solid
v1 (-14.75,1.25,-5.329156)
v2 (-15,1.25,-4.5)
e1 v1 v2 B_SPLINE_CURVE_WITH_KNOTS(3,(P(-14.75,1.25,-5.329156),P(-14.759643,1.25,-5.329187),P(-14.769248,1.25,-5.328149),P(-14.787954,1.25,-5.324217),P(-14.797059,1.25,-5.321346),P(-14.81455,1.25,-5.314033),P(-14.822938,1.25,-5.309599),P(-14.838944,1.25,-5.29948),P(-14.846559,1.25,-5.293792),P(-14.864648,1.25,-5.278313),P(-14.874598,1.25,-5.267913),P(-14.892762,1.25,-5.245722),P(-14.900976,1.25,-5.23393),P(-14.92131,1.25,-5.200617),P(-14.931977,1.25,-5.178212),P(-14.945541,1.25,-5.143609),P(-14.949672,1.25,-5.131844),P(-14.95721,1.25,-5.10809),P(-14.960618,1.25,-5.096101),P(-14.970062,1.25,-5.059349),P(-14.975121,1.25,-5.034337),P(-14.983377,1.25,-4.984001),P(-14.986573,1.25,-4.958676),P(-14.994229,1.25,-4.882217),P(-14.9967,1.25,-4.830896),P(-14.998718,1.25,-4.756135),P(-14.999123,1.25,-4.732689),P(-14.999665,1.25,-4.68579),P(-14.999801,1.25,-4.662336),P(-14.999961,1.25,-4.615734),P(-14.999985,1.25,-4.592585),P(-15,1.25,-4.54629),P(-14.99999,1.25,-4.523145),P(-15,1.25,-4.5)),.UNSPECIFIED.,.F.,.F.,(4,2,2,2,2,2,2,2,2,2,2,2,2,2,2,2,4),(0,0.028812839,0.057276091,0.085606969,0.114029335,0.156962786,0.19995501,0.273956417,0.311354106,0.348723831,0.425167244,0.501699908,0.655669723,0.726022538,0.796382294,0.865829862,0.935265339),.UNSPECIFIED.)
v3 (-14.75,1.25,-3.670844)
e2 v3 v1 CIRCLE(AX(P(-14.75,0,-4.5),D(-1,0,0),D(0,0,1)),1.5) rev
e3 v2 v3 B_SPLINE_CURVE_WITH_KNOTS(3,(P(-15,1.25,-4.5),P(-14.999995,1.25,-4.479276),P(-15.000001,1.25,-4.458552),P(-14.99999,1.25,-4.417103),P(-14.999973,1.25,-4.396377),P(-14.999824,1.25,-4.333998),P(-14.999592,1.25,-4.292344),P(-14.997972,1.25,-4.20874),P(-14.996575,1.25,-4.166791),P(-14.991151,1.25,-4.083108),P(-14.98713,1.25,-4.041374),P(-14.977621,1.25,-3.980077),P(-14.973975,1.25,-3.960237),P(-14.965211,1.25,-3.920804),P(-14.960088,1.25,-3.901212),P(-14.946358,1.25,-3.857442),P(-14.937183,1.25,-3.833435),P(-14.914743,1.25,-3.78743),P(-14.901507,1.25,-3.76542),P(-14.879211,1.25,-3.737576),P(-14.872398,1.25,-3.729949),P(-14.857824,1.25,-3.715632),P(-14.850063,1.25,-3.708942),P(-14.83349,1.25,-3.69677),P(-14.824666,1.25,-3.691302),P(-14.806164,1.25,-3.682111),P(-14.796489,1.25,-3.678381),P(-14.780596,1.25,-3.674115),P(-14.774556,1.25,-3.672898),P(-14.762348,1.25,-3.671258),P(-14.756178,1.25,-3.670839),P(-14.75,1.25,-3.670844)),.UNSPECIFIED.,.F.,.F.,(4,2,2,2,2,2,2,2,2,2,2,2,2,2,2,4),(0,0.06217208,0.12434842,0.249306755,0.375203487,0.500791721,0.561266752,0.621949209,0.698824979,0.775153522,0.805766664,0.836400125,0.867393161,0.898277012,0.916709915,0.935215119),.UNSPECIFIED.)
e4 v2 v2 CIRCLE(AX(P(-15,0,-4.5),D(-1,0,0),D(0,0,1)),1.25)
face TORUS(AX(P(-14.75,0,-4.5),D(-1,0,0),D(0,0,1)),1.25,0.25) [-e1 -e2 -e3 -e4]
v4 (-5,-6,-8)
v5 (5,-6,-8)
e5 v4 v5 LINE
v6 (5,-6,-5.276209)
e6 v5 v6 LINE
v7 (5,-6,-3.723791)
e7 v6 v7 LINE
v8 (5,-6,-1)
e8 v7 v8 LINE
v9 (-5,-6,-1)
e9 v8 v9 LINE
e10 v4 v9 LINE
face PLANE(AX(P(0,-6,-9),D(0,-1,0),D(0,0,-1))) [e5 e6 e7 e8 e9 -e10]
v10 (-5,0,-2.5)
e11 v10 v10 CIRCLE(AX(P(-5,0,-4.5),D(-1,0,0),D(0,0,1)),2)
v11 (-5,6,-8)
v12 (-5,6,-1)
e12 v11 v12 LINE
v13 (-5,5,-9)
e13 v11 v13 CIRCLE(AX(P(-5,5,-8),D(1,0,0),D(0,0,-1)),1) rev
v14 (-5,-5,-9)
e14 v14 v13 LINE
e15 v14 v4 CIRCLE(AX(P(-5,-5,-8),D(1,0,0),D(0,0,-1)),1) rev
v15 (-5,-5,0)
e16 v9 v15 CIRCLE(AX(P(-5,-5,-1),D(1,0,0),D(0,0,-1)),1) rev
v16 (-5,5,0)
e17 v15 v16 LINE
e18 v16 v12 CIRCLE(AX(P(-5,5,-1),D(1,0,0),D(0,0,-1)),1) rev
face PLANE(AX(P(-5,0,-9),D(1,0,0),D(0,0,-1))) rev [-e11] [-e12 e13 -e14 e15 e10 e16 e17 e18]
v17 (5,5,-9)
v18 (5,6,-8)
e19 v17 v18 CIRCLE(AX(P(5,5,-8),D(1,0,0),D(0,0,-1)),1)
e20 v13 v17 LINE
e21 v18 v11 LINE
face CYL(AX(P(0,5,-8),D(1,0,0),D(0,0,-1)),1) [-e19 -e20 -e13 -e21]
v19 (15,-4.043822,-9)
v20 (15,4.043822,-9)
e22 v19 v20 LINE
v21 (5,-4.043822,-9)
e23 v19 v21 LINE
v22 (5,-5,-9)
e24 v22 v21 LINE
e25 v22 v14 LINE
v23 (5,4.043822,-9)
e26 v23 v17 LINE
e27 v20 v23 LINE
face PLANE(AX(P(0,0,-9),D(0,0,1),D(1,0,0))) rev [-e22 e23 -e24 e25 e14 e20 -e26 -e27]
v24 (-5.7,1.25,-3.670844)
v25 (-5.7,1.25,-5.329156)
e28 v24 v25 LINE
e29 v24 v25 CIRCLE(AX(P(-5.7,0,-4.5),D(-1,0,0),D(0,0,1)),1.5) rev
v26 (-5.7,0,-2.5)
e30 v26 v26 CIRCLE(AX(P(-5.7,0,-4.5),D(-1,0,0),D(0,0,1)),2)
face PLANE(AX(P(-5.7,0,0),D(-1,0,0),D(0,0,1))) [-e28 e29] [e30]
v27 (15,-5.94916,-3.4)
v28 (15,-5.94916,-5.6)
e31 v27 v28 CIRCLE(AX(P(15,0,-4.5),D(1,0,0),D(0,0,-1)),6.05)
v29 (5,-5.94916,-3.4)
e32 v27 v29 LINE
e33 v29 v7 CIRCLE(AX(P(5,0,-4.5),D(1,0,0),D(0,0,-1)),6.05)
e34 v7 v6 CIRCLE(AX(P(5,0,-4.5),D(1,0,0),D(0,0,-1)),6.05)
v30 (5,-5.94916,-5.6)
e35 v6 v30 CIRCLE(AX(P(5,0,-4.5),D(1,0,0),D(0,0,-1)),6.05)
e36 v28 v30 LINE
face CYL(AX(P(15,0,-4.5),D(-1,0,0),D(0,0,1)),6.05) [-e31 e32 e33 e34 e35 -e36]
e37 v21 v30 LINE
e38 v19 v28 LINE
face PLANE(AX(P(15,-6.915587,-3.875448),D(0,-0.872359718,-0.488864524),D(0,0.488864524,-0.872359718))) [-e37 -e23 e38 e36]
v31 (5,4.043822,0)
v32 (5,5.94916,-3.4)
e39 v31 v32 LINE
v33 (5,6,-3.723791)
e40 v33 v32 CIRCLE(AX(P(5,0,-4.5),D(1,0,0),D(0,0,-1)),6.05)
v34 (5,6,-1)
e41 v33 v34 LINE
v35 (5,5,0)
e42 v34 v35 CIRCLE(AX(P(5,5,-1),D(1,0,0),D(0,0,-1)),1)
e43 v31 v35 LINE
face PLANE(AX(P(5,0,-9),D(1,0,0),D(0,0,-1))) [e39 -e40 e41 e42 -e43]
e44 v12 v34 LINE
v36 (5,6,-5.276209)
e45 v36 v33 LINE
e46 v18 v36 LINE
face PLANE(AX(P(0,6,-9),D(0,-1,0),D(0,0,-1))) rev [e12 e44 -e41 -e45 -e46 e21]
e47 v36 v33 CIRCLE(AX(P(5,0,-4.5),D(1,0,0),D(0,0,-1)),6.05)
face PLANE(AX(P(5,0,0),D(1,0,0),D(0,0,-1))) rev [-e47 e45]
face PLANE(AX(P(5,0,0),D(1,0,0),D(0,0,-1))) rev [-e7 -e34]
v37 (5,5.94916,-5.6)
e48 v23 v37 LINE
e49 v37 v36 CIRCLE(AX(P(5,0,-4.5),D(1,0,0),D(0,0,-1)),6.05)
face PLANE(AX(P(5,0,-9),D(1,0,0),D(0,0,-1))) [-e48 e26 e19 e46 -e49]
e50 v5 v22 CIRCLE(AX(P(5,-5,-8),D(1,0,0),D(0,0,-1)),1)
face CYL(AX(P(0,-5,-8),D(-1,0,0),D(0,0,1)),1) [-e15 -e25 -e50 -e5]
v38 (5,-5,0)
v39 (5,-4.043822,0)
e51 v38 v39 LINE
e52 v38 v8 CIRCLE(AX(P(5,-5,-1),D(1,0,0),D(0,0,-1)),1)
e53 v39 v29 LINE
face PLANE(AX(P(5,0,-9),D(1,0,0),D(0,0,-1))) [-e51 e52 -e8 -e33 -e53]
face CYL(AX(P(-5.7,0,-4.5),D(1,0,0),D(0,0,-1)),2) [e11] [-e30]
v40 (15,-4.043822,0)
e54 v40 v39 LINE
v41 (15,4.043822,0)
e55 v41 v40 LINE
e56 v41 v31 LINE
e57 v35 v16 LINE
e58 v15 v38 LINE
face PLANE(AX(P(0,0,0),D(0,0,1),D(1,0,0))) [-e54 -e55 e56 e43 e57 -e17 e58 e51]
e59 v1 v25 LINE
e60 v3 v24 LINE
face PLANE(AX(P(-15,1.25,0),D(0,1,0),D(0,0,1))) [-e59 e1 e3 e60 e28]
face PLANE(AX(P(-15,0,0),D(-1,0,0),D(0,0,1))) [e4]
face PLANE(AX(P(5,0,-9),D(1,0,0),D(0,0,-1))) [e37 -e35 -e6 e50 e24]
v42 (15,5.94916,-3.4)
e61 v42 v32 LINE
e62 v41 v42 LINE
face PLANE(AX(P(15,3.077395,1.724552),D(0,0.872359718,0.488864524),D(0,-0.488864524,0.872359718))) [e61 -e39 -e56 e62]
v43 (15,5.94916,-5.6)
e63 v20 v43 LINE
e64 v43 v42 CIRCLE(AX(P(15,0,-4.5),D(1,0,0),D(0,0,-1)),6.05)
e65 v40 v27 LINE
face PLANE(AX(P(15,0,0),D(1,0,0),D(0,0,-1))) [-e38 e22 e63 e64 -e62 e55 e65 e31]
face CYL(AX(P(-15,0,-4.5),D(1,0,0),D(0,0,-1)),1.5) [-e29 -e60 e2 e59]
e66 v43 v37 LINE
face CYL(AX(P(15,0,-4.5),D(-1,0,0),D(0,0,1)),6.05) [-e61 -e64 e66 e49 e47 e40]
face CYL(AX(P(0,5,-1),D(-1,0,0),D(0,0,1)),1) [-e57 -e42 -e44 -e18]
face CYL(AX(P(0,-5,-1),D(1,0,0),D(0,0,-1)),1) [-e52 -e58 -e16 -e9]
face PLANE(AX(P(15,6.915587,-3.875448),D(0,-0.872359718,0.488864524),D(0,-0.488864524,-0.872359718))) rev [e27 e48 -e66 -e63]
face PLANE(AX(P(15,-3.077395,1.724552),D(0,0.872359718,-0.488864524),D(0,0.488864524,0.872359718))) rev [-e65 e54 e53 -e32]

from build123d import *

# Parameters (mm, degrees)
SKETCH1_W           = 10
SKETCH1_H           = 12
SKETCH1_R           = 0.7
BOSS_EXTRUDE1_DEPTH = 9
BOSS_EXTRUDE2_DEPTH = 10
BOSS_EXTRUDE4_DEPTH = 0.7
BOSS_EXTRUDE5_DEPTH = 10
FILLET1_R           = 1
FILLET2_R           = 0.25


with BuildPart() as part:
    # Sketch1 → Boss-Extrude1 (new body)
    # profile 1 of 3: a face of its own
    with BuildSketch(Plane.XY):
        Rectangle(SKETCH1_W, SKETCH1_H)
        with Locations((0, 4.5)):
            Circle(SKETCH1_R, mode=Mode.SUBTRACT)
        with Locations((0, -4.5)):
            Circle(SKETCH1_R, mode=Mode.SUBTRACT)
    # profile 2 of 3: a face of its own
    with BuildSketch(Plane.XY):
        with Locations((0, -4.5)):
            Circle(SKETCH1_R)
    # profile 3 of 3: a face of its own
    with BuildSketch(Plane.XY):
        with Locations((0, 4.5)):
            Circle(SKETCH1_R)
    extrude(amount=-BOSS_EXTRUDE1_DEPTH)

    # Sketch2 → Boss-Extrude2 (add)
    with BuildSketch(Plane(origin=(5, 0, 0), x_dir=(0, 0, -1), z_dir=(1, 0, 0))):
        with BuildLine():
            Line((3.4, 5.949159605), (0, 4.043822449))
            Line((0, 4.043822449), (0, -4.043822449))
            Line((0, -4.043822449), (3.4, -5.949159605))
            ThreePointArc((3.4, -5.949159605), (3.561551285, -5.976772876), (3.723791265, -6))
            Line((3.723791265, -6), (5.276208735, -6))
            ThreePointArc((5.276208735, -6), (5.438448715, -5.976772876), (5.6, -5.949159605))
            Line((5.6, -5.949159605), (9, -4.043822449))
            Line((9, -4.043822449), (9, 4.043822449))
            Line((9, 4.043822449), (5.6, 5.949159605))
            ThreePointArc((5.6, 5.949159605), (5.438448715, 5.976772876), (5.276208735, 6))
            Line((5.276208735, 6), (3.723791265, 6))
            ThreePointArc((3.723791265, 6), (3.561551285, 5.976772876), (3.4, 5.949159605))
        make_face()
        with BuildLine():
            ThreePointArc((5.276208735, 6), (4.5, 6.05), (3.723791265, 6))
            Line((3.723791265, 6), (5.276208735, 6))
        make_face()
        with BuildLine():
            Line((5.276208735, -6), (3.723791265, -6))
            ThreePointArc((3.723791265, -6), (4.5, -6.05), (5.276208735, -6))
        make_face()
    extrude(amount=BOSS_EXTRUDE2_DEPTH)

    # Sketch4 → Boss-Extrude4 (add)
    with BuildSketch(Plane.ZY.offset(5)):
        with BuildLine():
            ThreePointArc((-6.5, 0), (-4.5, -2), (-2.5, 0))
            Line((-2.5, 0), (-3, 0))
            ThreePointArc((-3, 0), (-4.5, -1.5), (-6, 0))
            Line((-6, 0), (-6.5, 0))
        make_face()
        with BuildLine():
            Line((-3, 0), (-2.5, 0))
            ThreePointArc((-2.5, 0), (-4.5, 2), (-6.5, 0))
            Line((-6.5, 0), (-6, 0))
            ThreePointArc((-6, 0), (-5.821691018, 0.709318583), (-5.329156198, 1.25))
            ThreePointArc((-5.329156198, 1.25), (-4.5, 1.5), (-3.670843802, 1.25))
            ThreePointArc((-3.670843802, 1.25), (-3.178308982, 0.709318583), (-3, 0))
        make_face()
        with BuildLine():
            ThreePointArc((-6.5, 0), (-4.5, -2), (-2.5, 0))
            Line((-2.5, 0), (-3, 0))
            ThreePointArc((-3, 0), (-4.5, -1.5), (-6, 0))
            Line((-6, 0), (-6.5, 0))
        make_face()
        with BuildLine():
            Line((-3, 0), (-2.5, 0))
            ThreePointArc((-2.5, 0), (-4.5, 2), (-6.5, 0))
            Line((-6.5, 0), (-6, 0))
            ThreePointArc((-6, 0), (-5.821691018, 0.709318583), (-5.329156198, 1.25))
            ThreePointArc((-5.329156198, 1.25), (-4.5, 1.5), (-3.670843802, 1.25))
            ThreePointArc((-3.670843802, 1.25), (-3.178308982, 0.709318583), (-3, 0))
        make_face()
        with BuildLine():
            Line((-6, 0), (-3, 0))
            ThreePointArc((-3, 0), (-3.178308982, 0.709318583), (-3.670843802, 1.25))
            Line((-3.670843802, 1.25), (-5.329156198, 1.25))
            ThreePointArc((-5.329156198, 1.25), (-5.821691018, 0.709318583), (-6, 0))
        make_face()
        with BuildLine():
            Line((-5.329156198, 1.25), (-3.670843802, 1.25))
            ThreePointArc((-3.670843802, 1.25), (-4.5, 1.5), (-5.329156198, 1.25))
        make_face()
        with BuildLine():
            ThreePointArc((-6, 0), (-4.5, -1.5), (-3, 0))
            Line((-3, 0), (-6, 0))
        make_face()
    extrude(amount=BOSS_EXTRUDE4_DEPTH)

    # Sketch4<3> → Boss-Extrude5 (add)
    with BuildSketch(Plane.ZY.offset(5)):
        with BuildLine():
            Line((-6, 0), (-3, 0))
            ThreePointArc((-3, 0), (-3.178308982, 0.709318583), (-3.670843802, 1.25))
            Line((-3.670843802, 1.25), (-5.329156198, 1.25))
            ThreePointArc((-5.329156198, 1.25), (-5.821691018, 0.709318583), (-6, 0))
        make_face()
        with BuildLine():
            ThreePointArc((-6, 0), (-4.5, -1.5), (-3, 0))
            Line((-3, 0), (-6, 0))
        make_face()
    extrude(amount=BOSS_EXTRUDE5_DEPTH)

    # Fillet1
    fillet1_edges = [part.edges().sort_by_distance(p)[0] for p in [
        (0, 6, -9),
        (0, -6, -9),
        (0, 6, 0),
        (0, -6, 0),
    ]]
    fillet(fillet1_edges, radius=FILLET1_R)

    # Fillet2
    fillet2_edges = [part.edges().sort_by_distance(p)[0] for p in [
        (-15, -1.321691018, -5.209318583),
    ]]
    fillet(fillet2_edges, radius=FILLET2_R - 0.0001)  # a hair under: the kernel refuses the full size


solid = part.part
